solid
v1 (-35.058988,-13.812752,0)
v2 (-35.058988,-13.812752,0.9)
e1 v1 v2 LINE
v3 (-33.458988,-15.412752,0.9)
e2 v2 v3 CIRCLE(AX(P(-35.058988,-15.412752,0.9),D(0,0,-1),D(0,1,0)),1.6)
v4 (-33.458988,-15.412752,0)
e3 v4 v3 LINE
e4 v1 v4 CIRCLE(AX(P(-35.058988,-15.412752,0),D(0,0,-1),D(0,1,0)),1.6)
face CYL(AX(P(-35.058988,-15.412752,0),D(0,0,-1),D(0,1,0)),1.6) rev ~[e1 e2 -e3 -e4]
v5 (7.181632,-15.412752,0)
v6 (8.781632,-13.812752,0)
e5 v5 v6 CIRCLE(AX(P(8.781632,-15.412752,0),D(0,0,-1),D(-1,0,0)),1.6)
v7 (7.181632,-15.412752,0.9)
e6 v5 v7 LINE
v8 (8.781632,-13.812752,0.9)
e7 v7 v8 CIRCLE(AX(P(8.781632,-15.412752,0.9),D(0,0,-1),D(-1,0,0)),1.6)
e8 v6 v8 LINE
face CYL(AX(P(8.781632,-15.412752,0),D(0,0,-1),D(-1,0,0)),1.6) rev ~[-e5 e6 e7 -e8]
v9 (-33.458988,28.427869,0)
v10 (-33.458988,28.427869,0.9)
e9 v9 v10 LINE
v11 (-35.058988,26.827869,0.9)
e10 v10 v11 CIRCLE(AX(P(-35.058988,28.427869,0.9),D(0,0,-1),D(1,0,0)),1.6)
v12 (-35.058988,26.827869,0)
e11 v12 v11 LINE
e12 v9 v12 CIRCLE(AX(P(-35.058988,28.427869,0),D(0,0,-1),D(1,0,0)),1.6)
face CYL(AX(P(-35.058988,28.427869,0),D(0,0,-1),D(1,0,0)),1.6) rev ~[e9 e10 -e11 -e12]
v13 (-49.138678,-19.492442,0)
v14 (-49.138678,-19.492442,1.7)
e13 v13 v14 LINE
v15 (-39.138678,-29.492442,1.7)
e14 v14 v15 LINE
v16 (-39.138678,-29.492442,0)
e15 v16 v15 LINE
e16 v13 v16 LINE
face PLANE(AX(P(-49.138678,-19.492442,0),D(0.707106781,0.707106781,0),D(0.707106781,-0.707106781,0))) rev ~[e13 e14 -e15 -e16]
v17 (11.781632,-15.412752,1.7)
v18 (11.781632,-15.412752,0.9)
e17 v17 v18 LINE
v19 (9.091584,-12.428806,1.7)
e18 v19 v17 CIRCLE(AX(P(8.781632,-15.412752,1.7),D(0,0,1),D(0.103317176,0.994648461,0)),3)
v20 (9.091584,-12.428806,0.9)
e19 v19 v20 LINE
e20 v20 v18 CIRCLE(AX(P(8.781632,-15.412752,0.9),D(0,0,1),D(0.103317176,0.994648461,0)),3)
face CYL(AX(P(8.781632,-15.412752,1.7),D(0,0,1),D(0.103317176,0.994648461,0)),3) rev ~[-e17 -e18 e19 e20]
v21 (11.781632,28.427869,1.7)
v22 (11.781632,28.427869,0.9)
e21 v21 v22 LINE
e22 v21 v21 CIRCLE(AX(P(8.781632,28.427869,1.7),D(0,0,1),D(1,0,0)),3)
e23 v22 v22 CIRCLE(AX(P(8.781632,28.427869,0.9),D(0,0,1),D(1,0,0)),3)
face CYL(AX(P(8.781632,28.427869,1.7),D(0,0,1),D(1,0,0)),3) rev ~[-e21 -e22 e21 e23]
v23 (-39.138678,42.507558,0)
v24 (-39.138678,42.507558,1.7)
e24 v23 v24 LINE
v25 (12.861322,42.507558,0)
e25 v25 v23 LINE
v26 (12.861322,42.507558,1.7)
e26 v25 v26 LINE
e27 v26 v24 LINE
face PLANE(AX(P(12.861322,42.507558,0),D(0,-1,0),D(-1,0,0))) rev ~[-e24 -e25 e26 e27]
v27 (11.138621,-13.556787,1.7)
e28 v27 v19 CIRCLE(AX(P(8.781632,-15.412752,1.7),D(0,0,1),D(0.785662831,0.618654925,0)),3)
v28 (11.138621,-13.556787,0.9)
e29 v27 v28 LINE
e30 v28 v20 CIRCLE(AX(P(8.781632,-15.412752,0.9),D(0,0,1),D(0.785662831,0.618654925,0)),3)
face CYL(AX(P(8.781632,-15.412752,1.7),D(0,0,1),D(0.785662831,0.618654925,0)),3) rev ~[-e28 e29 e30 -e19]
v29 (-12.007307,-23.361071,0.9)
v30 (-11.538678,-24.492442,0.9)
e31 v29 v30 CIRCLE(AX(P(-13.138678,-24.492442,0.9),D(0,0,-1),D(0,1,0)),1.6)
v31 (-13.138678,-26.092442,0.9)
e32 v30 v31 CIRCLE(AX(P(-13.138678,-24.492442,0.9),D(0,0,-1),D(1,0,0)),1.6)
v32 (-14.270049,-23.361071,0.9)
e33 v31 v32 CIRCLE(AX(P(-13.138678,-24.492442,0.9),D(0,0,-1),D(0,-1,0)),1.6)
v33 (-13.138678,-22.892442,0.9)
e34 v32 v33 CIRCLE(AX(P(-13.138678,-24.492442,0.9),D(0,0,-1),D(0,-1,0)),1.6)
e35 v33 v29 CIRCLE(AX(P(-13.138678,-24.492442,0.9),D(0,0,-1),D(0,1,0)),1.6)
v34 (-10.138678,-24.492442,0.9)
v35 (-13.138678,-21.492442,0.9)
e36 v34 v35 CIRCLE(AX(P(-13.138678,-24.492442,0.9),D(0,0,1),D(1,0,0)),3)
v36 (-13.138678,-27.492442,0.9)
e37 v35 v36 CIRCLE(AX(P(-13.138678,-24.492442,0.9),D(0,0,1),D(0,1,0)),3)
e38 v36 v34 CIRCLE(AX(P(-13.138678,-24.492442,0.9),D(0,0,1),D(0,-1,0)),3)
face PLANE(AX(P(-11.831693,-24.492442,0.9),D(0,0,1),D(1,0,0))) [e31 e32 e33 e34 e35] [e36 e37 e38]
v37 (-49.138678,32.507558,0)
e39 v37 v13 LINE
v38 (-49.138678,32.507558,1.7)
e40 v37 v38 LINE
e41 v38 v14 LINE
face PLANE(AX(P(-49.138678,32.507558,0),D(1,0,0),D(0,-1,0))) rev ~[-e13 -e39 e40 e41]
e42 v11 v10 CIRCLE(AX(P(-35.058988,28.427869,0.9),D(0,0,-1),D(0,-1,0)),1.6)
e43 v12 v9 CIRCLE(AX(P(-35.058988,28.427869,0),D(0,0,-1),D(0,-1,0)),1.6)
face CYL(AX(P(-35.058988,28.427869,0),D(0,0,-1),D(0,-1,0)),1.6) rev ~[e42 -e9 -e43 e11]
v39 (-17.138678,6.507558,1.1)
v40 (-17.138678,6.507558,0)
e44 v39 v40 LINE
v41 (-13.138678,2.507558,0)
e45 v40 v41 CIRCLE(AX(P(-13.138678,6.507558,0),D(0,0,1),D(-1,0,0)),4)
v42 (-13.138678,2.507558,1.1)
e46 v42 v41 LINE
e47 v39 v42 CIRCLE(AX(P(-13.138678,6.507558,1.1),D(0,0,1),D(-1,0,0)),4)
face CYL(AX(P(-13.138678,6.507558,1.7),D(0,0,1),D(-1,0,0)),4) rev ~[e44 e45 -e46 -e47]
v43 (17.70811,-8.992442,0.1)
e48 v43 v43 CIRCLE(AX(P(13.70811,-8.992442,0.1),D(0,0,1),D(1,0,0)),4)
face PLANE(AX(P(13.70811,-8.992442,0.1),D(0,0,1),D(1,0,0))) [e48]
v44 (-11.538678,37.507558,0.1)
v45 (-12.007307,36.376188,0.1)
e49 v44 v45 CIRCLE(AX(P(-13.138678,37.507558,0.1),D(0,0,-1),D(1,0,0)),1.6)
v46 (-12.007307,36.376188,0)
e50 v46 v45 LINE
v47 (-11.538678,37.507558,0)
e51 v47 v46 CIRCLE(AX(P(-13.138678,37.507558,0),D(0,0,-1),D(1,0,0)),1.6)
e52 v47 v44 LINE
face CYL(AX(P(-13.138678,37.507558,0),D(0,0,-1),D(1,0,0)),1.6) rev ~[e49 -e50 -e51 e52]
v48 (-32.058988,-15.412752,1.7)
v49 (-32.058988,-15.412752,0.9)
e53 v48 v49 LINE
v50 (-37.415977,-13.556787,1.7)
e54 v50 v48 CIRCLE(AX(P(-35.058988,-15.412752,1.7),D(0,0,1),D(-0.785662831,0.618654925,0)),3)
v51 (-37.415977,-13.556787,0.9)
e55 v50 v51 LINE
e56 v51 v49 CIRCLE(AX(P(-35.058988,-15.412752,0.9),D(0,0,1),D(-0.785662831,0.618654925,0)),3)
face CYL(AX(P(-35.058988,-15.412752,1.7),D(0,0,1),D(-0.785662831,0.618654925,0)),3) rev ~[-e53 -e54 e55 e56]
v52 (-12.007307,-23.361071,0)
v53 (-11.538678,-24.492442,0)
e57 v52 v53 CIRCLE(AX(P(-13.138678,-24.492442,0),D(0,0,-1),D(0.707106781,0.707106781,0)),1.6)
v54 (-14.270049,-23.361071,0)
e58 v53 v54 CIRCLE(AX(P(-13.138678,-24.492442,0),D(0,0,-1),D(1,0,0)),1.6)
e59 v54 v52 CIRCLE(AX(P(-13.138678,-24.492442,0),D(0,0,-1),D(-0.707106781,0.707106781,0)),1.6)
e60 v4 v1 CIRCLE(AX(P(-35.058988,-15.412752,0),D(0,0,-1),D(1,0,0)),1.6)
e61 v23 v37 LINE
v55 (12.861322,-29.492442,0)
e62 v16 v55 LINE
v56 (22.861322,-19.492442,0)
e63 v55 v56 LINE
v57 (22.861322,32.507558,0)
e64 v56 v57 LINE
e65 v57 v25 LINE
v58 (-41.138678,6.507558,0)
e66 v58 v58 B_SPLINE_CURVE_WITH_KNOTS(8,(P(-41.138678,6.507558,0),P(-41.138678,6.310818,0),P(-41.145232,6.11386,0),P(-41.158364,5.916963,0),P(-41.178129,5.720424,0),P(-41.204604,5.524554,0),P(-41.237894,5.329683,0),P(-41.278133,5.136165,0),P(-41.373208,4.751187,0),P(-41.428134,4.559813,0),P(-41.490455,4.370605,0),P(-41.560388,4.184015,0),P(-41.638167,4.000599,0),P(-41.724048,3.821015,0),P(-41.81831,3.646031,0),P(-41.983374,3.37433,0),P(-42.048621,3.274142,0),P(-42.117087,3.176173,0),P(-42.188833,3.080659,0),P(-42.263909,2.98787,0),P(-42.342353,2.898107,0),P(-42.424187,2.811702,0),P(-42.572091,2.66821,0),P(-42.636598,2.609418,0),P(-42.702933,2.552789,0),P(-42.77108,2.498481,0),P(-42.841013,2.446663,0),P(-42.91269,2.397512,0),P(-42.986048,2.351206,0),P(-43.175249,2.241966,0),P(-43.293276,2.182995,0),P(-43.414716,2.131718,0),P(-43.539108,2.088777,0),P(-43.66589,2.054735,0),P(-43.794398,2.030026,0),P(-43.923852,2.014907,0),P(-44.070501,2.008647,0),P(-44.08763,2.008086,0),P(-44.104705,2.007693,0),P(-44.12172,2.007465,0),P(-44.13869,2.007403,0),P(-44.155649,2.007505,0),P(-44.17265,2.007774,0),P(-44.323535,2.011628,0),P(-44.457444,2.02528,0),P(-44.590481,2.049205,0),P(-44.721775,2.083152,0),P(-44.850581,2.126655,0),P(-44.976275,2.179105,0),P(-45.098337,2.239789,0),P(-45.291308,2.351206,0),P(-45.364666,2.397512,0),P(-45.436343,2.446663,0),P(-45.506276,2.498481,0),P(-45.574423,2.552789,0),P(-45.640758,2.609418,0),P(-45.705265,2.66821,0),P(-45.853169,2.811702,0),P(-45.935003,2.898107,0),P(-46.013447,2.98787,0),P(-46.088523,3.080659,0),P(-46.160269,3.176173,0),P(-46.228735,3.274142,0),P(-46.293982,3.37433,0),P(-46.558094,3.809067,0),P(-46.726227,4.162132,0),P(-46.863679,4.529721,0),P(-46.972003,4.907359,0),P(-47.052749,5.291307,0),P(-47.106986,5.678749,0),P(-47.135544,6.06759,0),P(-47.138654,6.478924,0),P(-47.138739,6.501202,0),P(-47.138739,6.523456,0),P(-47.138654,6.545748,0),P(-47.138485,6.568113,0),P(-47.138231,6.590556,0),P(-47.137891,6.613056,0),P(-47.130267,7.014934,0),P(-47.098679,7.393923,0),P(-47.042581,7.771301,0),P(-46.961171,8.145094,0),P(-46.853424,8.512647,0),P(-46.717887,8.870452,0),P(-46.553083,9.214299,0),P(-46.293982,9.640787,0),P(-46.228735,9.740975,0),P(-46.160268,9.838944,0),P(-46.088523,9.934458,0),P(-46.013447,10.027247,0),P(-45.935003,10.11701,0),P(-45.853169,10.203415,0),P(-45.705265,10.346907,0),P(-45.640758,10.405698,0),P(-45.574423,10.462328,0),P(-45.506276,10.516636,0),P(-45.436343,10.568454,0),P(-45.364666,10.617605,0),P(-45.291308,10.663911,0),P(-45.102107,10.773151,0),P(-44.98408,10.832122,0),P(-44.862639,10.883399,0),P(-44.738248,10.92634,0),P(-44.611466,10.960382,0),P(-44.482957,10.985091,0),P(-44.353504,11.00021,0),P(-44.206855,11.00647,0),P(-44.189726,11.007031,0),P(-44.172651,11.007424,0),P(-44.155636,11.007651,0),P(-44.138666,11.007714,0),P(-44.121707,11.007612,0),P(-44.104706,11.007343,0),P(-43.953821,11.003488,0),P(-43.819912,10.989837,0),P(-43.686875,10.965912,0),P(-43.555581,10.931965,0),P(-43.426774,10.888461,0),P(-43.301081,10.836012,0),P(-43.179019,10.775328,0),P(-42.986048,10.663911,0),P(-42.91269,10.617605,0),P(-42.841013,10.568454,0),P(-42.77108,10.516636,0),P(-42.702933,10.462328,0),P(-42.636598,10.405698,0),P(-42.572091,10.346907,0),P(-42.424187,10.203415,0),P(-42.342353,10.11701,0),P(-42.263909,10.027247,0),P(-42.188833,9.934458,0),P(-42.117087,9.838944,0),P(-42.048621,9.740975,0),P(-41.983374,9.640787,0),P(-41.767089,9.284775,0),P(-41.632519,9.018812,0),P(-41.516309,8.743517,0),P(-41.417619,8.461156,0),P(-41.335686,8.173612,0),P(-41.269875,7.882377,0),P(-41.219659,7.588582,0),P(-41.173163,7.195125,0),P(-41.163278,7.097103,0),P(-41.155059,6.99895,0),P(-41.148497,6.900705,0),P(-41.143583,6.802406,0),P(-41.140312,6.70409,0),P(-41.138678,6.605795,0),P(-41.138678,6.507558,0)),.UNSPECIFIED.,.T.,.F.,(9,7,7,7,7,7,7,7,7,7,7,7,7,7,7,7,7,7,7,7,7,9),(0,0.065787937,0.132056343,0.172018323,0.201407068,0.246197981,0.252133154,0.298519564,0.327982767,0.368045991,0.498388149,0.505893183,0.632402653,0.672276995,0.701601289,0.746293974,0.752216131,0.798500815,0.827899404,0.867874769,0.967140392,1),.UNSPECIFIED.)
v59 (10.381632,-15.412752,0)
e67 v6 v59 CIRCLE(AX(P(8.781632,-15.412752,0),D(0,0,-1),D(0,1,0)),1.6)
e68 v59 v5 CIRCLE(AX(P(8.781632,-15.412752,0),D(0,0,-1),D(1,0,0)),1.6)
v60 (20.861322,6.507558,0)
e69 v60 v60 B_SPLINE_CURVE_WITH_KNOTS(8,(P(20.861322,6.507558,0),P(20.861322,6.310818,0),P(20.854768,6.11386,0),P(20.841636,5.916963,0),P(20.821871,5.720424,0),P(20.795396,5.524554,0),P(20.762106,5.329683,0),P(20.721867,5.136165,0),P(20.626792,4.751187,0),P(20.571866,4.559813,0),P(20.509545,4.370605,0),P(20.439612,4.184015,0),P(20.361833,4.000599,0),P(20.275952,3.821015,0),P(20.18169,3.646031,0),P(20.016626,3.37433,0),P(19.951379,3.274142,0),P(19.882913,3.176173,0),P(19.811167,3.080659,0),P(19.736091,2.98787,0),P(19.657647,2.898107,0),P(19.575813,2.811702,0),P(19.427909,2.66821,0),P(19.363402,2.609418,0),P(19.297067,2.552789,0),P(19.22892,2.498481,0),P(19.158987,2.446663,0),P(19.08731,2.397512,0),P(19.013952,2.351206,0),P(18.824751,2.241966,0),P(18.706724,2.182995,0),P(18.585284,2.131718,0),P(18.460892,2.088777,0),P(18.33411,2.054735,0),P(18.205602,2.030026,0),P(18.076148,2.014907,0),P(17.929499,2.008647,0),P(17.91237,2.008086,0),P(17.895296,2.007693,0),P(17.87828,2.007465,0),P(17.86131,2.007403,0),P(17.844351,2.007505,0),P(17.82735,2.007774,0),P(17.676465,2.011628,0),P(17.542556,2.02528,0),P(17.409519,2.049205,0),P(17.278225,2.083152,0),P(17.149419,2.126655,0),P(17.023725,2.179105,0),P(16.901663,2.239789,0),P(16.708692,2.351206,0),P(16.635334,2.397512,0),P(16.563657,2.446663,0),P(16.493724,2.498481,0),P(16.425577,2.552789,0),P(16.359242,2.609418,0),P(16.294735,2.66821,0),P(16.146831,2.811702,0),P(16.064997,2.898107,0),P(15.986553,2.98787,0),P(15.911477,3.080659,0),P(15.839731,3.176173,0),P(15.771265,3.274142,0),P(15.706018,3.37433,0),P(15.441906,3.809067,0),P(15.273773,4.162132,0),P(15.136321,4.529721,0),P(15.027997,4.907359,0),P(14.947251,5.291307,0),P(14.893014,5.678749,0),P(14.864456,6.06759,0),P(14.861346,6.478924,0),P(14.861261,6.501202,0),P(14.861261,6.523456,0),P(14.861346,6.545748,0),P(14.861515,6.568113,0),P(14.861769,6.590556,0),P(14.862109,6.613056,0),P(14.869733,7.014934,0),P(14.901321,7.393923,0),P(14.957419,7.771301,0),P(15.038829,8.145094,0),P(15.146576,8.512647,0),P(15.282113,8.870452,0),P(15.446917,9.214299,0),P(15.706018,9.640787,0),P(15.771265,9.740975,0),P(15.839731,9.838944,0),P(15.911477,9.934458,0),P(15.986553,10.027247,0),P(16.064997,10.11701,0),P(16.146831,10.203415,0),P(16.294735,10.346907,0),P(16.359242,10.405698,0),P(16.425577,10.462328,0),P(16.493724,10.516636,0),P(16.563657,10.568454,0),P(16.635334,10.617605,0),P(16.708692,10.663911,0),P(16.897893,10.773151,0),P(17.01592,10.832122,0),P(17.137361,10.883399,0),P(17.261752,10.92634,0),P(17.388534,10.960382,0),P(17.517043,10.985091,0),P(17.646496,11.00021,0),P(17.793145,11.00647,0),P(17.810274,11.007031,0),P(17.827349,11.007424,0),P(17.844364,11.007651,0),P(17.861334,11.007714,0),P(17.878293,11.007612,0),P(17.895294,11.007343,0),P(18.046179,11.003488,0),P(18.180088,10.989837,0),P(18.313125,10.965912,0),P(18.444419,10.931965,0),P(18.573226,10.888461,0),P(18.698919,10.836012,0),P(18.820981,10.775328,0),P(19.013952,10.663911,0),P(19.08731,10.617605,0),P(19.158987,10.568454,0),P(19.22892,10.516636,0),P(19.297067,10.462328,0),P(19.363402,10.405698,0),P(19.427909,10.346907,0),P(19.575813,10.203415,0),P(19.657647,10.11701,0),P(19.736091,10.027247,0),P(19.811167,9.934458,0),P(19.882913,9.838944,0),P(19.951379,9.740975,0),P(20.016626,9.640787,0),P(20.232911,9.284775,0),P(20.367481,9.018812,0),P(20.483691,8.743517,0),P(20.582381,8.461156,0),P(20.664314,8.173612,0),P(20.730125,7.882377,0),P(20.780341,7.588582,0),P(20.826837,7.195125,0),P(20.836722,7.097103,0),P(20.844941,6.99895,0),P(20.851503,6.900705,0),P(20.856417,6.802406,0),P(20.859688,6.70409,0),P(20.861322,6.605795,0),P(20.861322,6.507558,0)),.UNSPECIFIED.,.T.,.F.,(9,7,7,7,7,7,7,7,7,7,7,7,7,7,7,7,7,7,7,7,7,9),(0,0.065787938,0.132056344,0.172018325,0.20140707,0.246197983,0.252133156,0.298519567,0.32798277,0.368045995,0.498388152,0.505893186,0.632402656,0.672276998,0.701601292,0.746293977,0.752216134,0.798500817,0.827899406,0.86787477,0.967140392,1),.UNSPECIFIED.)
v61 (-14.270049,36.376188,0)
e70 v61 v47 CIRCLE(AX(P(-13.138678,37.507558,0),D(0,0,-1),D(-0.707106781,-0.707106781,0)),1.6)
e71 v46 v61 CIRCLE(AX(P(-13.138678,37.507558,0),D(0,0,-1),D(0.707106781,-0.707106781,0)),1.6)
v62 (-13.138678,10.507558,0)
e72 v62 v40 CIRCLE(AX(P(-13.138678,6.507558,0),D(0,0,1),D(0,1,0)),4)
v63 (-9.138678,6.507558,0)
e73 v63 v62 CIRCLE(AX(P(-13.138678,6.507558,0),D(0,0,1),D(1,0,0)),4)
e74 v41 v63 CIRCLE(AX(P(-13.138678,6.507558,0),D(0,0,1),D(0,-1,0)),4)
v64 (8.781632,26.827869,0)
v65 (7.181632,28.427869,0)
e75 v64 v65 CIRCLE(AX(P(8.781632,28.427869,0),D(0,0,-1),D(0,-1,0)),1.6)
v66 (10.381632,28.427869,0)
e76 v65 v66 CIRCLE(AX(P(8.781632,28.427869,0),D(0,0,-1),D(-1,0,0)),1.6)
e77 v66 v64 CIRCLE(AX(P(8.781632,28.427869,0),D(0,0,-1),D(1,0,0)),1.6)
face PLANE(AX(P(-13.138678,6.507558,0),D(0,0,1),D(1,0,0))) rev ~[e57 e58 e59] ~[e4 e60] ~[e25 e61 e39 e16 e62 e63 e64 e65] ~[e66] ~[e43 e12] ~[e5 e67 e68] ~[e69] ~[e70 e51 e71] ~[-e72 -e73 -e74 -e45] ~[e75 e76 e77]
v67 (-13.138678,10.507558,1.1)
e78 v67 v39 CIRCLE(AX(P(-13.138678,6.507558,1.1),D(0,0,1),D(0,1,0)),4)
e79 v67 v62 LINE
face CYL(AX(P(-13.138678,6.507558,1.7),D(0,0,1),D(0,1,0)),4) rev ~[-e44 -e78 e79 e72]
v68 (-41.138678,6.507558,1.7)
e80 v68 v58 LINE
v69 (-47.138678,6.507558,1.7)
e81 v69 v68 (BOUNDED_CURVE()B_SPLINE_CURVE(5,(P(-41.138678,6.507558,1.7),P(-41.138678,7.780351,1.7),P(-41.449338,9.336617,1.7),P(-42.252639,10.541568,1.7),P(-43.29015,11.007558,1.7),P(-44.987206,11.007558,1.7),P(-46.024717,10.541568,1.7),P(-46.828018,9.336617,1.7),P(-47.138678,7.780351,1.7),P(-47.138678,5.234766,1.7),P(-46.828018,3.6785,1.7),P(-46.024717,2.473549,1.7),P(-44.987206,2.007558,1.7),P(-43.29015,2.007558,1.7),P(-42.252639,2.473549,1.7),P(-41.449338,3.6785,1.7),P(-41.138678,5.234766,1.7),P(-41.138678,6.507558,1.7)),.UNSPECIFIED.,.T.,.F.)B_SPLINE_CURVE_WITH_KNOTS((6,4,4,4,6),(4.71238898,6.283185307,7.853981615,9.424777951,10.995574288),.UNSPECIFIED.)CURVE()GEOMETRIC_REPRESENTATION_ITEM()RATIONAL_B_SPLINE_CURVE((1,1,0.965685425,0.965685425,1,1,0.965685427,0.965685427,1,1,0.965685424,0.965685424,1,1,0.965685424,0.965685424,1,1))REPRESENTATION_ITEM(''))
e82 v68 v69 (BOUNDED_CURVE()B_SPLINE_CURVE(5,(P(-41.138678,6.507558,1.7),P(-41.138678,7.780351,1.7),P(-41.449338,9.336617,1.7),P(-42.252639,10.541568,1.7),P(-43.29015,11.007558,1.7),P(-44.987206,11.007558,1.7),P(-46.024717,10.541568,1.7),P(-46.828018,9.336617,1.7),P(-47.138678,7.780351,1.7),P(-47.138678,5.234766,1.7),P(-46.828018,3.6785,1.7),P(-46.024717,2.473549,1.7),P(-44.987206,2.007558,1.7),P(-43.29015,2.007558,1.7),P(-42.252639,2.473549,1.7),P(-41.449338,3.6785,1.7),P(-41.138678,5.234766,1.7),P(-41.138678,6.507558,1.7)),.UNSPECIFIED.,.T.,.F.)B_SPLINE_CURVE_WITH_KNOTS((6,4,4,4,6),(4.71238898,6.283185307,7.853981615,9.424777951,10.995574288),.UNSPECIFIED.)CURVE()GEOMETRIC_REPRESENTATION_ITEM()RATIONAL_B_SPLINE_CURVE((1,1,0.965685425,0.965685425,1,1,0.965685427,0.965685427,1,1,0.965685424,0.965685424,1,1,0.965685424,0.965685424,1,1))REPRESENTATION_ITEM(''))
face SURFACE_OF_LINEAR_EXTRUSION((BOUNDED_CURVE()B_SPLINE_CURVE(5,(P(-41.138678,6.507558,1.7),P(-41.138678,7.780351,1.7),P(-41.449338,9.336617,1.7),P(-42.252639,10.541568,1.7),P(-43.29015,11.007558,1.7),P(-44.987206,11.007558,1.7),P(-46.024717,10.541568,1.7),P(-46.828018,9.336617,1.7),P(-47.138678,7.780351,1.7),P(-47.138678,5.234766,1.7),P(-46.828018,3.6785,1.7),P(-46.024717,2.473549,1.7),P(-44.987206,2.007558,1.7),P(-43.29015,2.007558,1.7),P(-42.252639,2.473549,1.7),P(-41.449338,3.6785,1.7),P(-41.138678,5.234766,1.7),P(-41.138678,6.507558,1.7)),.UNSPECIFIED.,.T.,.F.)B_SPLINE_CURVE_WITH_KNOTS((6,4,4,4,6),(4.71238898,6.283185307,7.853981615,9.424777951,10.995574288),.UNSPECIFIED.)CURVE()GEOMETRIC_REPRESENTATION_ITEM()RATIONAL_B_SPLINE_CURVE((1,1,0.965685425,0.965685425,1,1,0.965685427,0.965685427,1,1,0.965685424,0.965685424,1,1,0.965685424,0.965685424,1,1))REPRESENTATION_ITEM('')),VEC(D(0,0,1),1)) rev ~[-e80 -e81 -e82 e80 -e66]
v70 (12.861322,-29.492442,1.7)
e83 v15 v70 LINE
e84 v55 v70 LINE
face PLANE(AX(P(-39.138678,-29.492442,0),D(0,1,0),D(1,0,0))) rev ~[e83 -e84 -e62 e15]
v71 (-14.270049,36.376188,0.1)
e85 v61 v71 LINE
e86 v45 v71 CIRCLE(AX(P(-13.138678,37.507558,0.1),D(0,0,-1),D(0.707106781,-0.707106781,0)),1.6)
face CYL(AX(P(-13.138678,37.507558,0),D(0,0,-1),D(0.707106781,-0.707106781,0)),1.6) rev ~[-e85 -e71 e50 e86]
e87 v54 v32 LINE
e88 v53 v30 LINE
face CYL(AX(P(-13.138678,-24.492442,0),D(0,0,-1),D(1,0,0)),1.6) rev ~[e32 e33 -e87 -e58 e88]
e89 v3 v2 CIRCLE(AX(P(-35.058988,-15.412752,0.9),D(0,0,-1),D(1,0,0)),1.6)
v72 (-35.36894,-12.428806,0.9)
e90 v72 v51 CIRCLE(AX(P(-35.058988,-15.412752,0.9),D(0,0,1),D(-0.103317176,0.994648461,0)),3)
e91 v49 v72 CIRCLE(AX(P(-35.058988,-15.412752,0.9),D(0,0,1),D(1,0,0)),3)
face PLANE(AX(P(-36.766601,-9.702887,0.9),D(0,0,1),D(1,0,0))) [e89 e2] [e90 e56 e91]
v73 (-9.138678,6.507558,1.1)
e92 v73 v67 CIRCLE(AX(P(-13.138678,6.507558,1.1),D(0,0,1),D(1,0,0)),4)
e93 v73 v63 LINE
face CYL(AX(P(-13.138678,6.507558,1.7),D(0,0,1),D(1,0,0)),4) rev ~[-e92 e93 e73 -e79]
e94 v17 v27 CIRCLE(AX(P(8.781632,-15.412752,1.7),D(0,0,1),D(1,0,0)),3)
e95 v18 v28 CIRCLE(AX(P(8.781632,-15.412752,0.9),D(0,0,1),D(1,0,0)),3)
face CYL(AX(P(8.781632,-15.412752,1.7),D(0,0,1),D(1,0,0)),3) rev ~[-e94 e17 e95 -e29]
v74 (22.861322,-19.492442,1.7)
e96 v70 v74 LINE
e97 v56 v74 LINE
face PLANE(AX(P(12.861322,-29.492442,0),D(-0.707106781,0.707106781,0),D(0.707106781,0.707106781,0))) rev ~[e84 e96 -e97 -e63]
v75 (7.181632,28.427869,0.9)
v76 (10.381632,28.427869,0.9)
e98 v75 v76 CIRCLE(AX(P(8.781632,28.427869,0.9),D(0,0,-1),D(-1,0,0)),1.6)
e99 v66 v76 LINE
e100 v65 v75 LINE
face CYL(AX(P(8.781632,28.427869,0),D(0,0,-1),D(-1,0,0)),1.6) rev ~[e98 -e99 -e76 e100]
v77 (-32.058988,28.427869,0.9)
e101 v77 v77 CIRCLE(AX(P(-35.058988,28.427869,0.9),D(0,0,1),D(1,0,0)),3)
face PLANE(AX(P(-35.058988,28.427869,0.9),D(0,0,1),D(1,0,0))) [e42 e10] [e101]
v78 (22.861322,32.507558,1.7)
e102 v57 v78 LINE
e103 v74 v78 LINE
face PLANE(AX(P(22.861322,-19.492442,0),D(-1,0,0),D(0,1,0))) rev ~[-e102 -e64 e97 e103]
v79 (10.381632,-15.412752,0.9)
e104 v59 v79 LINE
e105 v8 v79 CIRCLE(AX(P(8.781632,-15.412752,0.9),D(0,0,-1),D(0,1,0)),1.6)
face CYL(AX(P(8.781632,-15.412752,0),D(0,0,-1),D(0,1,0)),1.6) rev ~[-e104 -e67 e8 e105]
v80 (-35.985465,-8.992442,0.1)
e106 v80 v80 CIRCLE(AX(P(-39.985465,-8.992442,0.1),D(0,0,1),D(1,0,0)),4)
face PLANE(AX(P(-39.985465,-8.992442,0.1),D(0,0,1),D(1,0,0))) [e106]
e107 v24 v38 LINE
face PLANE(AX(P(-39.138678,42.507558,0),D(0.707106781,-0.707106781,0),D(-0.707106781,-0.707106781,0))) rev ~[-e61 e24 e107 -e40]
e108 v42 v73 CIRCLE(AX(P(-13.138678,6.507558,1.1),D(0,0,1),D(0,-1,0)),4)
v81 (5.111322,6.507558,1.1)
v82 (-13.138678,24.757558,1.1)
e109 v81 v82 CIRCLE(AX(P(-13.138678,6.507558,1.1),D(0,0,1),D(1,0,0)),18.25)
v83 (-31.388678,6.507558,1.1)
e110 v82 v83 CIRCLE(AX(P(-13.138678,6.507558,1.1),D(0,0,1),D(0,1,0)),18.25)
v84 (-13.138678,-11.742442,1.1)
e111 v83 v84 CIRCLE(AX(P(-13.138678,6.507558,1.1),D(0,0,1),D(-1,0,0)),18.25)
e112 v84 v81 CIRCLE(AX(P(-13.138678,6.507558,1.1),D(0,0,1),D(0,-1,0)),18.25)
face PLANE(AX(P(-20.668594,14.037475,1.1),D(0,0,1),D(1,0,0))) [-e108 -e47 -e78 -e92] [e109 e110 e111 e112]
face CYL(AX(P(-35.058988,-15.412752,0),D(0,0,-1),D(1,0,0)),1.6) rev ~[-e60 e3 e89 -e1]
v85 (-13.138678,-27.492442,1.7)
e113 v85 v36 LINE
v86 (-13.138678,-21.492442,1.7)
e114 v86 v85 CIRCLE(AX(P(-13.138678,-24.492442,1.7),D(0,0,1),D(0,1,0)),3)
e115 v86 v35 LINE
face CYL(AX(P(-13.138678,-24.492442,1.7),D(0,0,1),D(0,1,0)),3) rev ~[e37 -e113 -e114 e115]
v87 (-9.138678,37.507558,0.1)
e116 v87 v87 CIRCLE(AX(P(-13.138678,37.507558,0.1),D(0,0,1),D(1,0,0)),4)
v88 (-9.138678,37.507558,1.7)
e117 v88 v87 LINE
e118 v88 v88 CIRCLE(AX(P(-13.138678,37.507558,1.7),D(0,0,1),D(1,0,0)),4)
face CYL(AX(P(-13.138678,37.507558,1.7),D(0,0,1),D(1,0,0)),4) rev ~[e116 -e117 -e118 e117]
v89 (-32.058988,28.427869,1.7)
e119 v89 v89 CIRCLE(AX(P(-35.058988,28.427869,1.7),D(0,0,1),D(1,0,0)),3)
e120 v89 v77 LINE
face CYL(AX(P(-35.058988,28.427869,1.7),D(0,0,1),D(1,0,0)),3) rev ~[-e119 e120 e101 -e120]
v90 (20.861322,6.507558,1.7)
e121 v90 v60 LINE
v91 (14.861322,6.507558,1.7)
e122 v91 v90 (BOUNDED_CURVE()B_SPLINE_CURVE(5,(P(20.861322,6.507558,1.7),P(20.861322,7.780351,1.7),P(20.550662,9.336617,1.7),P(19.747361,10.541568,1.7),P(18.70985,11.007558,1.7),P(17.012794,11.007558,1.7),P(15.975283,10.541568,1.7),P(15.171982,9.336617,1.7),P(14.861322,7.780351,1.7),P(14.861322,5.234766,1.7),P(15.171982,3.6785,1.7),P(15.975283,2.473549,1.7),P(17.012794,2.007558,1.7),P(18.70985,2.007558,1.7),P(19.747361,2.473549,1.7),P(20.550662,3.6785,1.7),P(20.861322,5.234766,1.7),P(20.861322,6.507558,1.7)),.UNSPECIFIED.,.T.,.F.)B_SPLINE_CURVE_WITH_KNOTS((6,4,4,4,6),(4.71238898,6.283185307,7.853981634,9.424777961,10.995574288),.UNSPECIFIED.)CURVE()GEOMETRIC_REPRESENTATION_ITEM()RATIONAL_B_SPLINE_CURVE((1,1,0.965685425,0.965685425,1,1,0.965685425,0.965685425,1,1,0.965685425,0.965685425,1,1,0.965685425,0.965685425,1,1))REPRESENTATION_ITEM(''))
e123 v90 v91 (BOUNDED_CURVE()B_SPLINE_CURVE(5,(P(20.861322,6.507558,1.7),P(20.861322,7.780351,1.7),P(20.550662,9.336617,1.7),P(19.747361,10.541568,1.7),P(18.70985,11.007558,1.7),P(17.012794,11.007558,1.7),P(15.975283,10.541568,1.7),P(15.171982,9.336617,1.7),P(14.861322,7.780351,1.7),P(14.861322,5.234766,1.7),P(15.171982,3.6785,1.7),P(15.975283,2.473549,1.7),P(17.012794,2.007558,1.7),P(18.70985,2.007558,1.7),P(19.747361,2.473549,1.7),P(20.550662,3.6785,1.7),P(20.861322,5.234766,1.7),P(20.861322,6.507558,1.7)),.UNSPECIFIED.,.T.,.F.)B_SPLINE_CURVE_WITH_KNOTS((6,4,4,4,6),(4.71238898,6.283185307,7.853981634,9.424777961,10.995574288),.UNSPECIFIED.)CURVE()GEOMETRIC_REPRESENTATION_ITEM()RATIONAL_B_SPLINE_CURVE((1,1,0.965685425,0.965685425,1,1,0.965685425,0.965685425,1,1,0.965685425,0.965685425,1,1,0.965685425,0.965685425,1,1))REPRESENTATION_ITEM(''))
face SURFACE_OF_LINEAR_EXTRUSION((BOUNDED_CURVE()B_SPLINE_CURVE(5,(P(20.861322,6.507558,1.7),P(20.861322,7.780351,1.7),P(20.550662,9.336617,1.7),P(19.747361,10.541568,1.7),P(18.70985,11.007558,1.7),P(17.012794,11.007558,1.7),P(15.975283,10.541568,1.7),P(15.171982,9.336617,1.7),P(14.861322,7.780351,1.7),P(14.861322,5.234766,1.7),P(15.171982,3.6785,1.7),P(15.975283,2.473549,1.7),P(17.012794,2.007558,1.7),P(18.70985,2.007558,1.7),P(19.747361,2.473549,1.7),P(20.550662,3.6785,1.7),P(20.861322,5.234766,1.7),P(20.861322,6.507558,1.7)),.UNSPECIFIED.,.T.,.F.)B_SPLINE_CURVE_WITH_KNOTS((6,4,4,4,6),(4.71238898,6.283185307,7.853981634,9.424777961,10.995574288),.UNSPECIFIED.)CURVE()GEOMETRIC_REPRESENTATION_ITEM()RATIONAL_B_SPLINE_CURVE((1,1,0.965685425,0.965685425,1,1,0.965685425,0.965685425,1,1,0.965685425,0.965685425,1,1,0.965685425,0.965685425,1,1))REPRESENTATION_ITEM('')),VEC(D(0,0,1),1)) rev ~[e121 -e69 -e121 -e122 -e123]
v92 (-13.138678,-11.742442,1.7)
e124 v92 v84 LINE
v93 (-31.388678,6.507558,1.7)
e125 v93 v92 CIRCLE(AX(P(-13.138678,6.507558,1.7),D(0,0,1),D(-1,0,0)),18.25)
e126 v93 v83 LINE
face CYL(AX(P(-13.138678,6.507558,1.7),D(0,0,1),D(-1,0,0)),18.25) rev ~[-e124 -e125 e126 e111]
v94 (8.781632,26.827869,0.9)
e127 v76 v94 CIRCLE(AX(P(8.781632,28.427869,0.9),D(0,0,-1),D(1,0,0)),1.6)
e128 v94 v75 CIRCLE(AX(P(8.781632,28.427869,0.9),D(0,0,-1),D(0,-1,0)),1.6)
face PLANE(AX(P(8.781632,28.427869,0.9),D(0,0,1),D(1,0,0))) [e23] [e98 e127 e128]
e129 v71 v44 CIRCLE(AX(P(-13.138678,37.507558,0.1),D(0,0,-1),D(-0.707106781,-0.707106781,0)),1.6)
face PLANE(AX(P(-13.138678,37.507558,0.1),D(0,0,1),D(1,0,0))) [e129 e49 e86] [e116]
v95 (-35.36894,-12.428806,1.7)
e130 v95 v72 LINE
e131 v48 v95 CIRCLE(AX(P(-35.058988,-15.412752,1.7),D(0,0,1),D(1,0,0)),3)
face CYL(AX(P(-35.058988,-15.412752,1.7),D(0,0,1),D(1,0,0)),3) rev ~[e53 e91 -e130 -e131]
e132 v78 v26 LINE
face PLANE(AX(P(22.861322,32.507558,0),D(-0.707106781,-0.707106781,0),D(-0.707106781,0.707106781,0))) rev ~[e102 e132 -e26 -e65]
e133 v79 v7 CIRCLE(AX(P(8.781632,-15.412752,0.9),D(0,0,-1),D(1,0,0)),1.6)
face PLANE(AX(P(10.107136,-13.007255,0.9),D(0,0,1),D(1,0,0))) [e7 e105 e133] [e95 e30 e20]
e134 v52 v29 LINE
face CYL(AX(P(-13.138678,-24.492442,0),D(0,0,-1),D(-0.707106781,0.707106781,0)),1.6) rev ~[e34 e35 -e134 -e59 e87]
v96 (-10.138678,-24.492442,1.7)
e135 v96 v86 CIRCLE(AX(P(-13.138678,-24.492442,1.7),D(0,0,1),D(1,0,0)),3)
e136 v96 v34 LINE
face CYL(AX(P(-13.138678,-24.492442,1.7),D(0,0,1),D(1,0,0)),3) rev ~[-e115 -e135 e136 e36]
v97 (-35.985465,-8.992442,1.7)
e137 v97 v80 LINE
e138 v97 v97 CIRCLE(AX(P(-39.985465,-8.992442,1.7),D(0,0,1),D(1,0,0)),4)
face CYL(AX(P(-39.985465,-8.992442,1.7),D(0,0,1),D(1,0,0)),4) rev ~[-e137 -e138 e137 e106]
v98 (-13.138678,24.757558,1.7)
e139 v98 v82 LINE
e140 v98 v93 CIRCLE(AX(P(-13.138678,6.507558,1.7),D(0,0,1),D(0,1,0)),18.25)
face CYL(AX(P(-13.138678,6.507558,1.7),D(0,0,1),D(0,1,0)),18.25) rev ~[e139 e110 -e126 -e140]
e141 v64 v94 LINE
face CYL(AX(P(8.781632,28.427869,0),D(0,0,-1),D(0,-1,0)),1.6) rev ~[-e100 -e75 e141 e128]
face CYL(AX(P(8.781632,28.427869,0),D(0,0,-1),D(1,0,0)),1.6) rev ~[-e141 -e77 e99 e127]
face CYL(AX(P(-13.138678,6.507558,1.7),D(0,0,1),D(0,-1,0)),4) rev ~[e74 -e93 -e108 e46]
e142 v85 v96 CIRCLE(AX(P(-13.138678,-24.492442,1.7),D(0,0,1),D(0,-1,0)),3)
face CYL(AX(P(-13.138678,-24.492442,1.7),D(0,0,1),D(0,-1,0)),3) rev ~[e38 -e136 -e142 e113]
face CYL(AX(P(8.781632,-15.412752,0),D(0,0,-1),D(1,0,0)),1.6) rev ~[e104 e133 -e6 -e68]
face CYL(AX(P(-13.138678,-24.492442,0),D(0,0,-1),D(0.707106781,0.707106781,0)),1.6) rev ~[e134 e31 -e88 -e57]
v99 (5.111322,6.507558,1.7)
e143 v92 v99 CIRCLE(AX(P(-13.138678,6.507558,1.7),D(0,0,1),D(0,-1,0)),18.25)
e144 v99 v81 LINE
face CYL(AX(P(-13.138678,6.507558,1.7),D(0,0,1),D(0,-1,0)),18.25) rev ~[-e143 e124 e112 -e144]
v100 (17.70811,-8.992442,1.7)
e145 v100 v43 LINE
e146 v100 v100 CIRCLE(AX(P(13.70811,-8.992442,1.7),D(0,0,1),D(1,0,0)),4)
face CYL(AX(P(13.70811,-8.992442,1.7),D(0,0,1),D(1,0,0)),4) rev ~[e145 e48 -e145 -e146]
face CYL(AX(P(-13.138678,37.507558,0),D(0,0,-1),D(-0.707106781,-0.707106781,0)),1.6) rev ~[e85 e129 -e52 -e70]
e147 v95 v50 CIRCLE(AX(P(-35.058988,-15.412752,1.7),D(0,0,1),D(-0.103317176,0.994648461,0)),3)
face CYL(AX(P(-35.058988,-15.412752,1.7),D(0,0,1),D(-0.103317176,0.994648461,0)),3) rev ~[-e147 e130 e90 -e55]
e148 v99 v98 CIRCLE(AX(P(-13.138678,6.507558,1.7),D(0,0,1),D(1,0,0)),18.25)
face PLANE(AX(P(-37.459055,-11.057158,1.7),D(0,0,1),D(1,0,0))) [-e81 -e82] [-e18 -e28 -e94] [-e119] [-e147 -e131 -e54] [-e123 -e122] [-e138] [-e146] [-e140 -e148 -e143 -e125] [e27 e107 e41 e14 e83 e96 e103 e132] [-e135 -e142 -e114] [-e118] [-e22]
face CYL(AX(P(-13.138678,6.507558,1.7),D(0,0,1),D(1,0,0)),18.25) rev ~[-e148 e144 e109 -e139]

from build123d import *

# Parameters (mm, degrees)
F0_R      = 18.25
F1_DEPTH  = 1.7
F3_DEPTH  = 0.6
F4_R      = 1.6
F4_R_2    = 3
F5_DEPTH  = 0.8
F7_DEPTH  = 25
F8_R      = 2.5
F9_DEPTH  = 1.6
F10_R     = 4
F10_R_2   = 3
F11_DEPTH = 1.6
F13_DEPTH = 0.8
F15_DEPTH = 25


with BuildPart() as f1:
    # F0 (on Top) → F1 (new body)
    with BuildSketch(Plane.XY):
        Polygon((12.8613220751, 42.5075584586), (-39.1386779249, 42.5075584586), (-49.1386779249, 32.5075584586), (-49.1386779249, -19.4924415414), (-39.1386779249, -29.4924415414), (12.8613220751, -29.4924415414), (22.8613220751, -19.4924415414), (22.8613220751, 32.5075584586), align=None)
        with BuildLine():
            ThreePointArc((-35.0589881417, 26.8278686754), (-36.1903589916, 29.5592395253), (-33.4589881417, 28.4278686754))
            Line((-33.4589881417, 28.4278686754), (-22.2183677081, 28.4278686754))
            Line((-22.2183677081, 28.4278686754), (-14.2700487748, 36.3761876087))
            ThreePointArc((-14.2700487748, 36.3761876087), (-13.7509714167, 38.9857657106), (-11.5386779249, 37.5075584586))
            ThreePointArc((-11.5386779249, 37.5075584586), (-11.6604706729, 36.8952649668), (-12.007307075, 36.3761876087))
            Line((-12.007307075, 36.3761876087), (-4.0589881417, 28.4278686754))
            Line((-4.0589881417, 28.4278686754), (7.1816322919, 28.4278686754))
            ThreePointArc((7.1816322919, 28.4278686754), (8.7816322919, 30.0278686754), (10.3816322919, 28.4278686754))
            ThreePointArc((10.3816322919, 28.4278686754), (9.9130031418, 27.2964978255), (8.7816322919, 26.8278686754))
            Line((8.7816322919, 26.8278686754), (8.7816322919, 15.5872482418))
            Line((8.7816322919, 15.5872482418), (16.7299512252, 7.6389293085))
            ThreePointArc((16.7299512252, 7.6389293085), (18.4736155669, 7.9857657106), (19.4613220751, 6.5075584586))
            ThreePointArc((19.4613220751, 6.5075584586), (18.4736155669, 5.0293512066), (16.7299512252, 5.3761876087))
            Line((16.7299512252, 5.3761876087), (8.7816322919, -2.5721313246))
            Line((8.7816322919, -2.5721313246), (8.7816322919, -13.8127517582))
            ThreePointArc((8.7816322919, -13.8127517582), (9.9130031418, -14.2813809083), (10.3816322919, -15.4127517582))
            ThreePointArc((10.3816322919, -15.4127517582), (8.7816322919, -17.0127517582), (7.1816322919, -15.4127517582))
            Line((7.1816322919, -15.4127517582), (-4.0589881417, -15.4127517582))
            Line((-4.0589881417, -15.4127517582), (-12.007307075, -23.3610706915))
            ThreePointArc((-12.007307075, -23.3610706915), (-11.6604706729, -23.8801480496), (-11.5386779249, -24.4924415414))
            ThreePointArc((-11.5386779249, -24.4924415414), (-13.7509714167, -25.9706487934), (-14.2700487748, -23.3610706915))
            Line((-14.2700487748, -23.3610706915), (-22.2183677081, -15.4127517582))
            Line((-22.2183677081, -15.4127517582), (-33.4589881417, -15.4127517582))
            ThreePointArc((-33.4589881417, -15.4127517582), (-36.1903589916, -16.5441226081), (-35.0589881417, -13.8127517582))
            Line((-35.0589881417, -13.8127517582), (-35.0589881417, -2.5721313246))
            Line((-35.0589881417, -2.5721313246), (-43.007307075, 5.3761876087))
            ThreePointArc((-43.007307075, 5.3761876087), (-45.7386779249, 6.5075584586), (-43.007307075, 7.6389293085))
            Line((-43.007307075, 7.6389293085), (-35.0589881417, 15.5872482418))
            Line((-35.0589881417, 15.5872482418), (-35.0589881417, 26.8278686754))
        make_face(mode=Mode.SUBTRACT)
        with BuildLine():
            Line((-22.2183677081, 28.4278686754), (-33.4589881417, 28.4278686754))
            ThreePointArc((-33.4589881417, 28.4278686754), (-33.9276172918, 27.2964978255), (-35.0589881417, 26.8278686754))
            Line((-35.0589881417, 26.8278686754), (-35.0589881417, 15.5872482418))
            Line((-35.0589881417, 15.5872482418), (-22.2183677081, 28.4278686754))
        make_face()
        with BuildLine():
            Line((-14.2700487748, 36.3761876087), (-22.2183677081, 28.4278686754))
            Line((-22.2183677081, 28.4278686754), (-4.0589881417, 28.4278686754))
            Line((-4.0589881417, 28.4278686754), (-12.007307075, 36.3761876087))
            ThreePointArc((-12.007307075, 36.3761876087), (-13.1386779249, 35.9075584586), (-14.2700487748, 36.3761876087))
        make_face()
        with BuildLine():
            Line((7.1816322919, 28.4278686754), (-4.0589881417, 28.4278686754))
            Line((-4.0589881417, 28.4278686754), (8.7816322919, 15.5872482418))
            Line((8.7816322919, 15.5872482418), (8.7816322919, 26.8278686754))
            ThreePointArc((8.7816322919, 26.8278686754), (7.650261442, 27.2964978255), (7.1816322919, 28.4278686754))
        make_face()
        with BuildLine():
            Line((16.7299512252, 7.6389293085), (8.7816322919, 15.5872482418))
            Line((8.7816322919, 15.5872482418), (8.7816322919, -2.5721313246))
            Line((8.7816322919, -2.5721313246), (16.7299512252, 5.3761876087))
            ThreePointArc((16.7299512252, 5.3761876087), (16.2613220751, 6.5075584586), (16.7299512252, 7.6389293085))
        make_face()
        with BuildLine():
            Line((8.7816322919, -13.8127517582), (8.7816322919, -2.5721313246))
            Line((8.7816322919, -2.5721313246), (-4.0589881417, -15.4127517582))
            Line((-4.0589881417, -15.4127517582), (7.1816322919, -15.4127517582))
            ThreePointArc((7.1816322919, -15.4127517582), (7.650261442, -14.2813809083), (8.7816322919, -13.8127517582))
        make_face()
        with BuildLine():
            Line((-4.0589881417, -15.4127517582), (-22.2183677081, -15.4127517582))
            Line((-22.2183677081, -15.4127517582), (-14.2700487748, -23.3610706915))
            ThreePointArc((-14.2700487748, -23.3610706915), (-13.1386779249, -22.8924415414), (-12.007307075, -23.3610706915))
            Line((-12.007307075, -23.3610706915), (-4.0589881417, -15.4127517582))
        make_face()
        with BuildLine():
            Line((-22.2183677081, -15.4127517582), (-35.0589881417, -2.5721313246))
            Line((-35.0589881417, -2.5721313246), (-35.0589881417, -13.8127517582))
            ThreePointArc((-35.0589881417, -13.8127517582), (-33.9276172918, -14.2813809083), (-33.4589881417, -15.4127517582))
            Line((-33.4589881417, -15.4127517582), (-22.2183677081, -15.4127517582))
        make_face()
        with BuildLine():
            Line((-35.0589881417, -2.5721313246), (-35.0589881417, 15.5872482418))
            Line((-35.0589881417, 15.5872482418), (-43.007307075, 7.6389293085))
            ThreePointArc((-43.007307075, 7.6389293085), (-42.6604706729, 7.1198519504), (-42.5386779249, 6.5075584586))
            ThreePointArc((-42.5386779249, 6.5075584586), (-42.6604706729, 5.8952649668), (-43.007307075, 5.3761876087))
            Line((-43.007307075, 5.3761876087), (-35.0589881417, -2.5721313246))
        make_face()
        Polygon((-4.0589881417, 28.4278686754), (-22.2183677081, 28.4278686754), (-35.0589881417, 15.5872482418), (-35.0589881417, -2.5721313246), (-22.2183677081, -15.4127517582), (-4.0589881417, -15.4127517582), (8.7816322919, -2.5721313246), (8.7816322919, 15.5872482418), align=None)
        with Locations((-13.1386779249, 6.5075584586)):
            Circle(F0_R, mode=Mode.SUBTRACT)
        with Locations((-13.1386779249, 6.5075584586)):
            Circle(F0_R)
    extrude(amount=F1_DEPTH)

    # F2 (on face) → F3 (cut)
    with BuildSketch(Plane.XY.offset(1.7)):
        with BuildLine():
            Line((-31.3886779249, 6.5075584586), (-13.1386779249, 6.5075584586))
            Line((-13.1386779249, 6.5075584586), (-13.1386779249, 24.7575584586))
            ThreePointArc((-13.1386779249, 24.7575584586), (-26.0433766815, 19.4122572153), (-31.3886779249, 6.5075584586))
        make_face()
        with BuildLine():
            ThreePointArc((-13.1386779249, -11.7424415414), (-0.2339791682, -6.397140298), (5.1113220751, 6.5075584586))
            Line((5.1113220751, 6.5075584586), (-13.1386779249, 6.5075584586))
            Line((-13.1386779249, 6.5075584586), (-13.1386779249, -11.7424415414))
        make_face()
        with BuildLine():
            Line((-13.1386779249, 6.5075584586), (5.1113220751, 6.5075584586))
            ThreePointArc((5.1113220751, 6.5075584586), (-0.2339791682, 19.4122572153), (-13.1386779249, 24.7575584586))
            Line((-13.1386779249, 24.7575584586), (-13.1386779249, 6.5075584586))
        make_face()
        with BuildLine():
            Line((-13.1386779249, -11.7424415414), (-13.1386779249, 6.5075584586))
            Line((-13.1386779249, 6.5075584586), (-31.3886779249, 6.5075584586))
            ThreePointArc((-31.3886779249, 6.5075584586), (-26.0433766815, -6.397140298), (-13.1386779249, -11.7424415414))
        make_face()
    extrude(amount=-F3_DEPTH, mode=Mode.SUBTRACT)

    # F4 (on face) → F5 (cut)
    with BuildSketch(Plane.XY.offset(1.7)):
        with BuildLine():
            ThreePointArc((-45.7386779249, 6.5075584586), (-44.1386779249, 8.1075584586), (-42.5386779249, 6.5075584586))
            Line((-42.5386779249, 6.5075584586), (-41.1386779249, 6.5075584586))
            ThreePointArc((-41.1386779249, 6.5075584586), (-44.1386779249, 9.5075584586), (-47.1386779249, 6.5075584586))
            Line((-47.1386779249, 6.5075584586), (-45.7386779249, 6.5075584586))
        make_face()
        with BuildLine():
            ThreePointArc((-45.7386779249, 6.5075584586), (-44.1386779249, 4.9075584586), (-42.5386779249, 6.5075584586))
            Line((-42.5386779249, 6.5075584586), (-45.7386779249, 6.5075584586))
        make_face()
        with BuildLine():
            Line((-45.7386779249, 6.5075584586), (-42.5386779249, 6.5075584586))
            ThreePointArc((-42.5386779249, 6.5075584586), (-44.1386779249, 8.1075584586), (-45.7386779249, 6.5075584586))
        make_face()
        with BuildLine():
            Line((-41.1386779249, 6.5075584586), (-42.5386779249, 6.5075584586))
            ThreePointArc((-42.5386779249, 6.5075584586), (-44.1386779249, 4.9075584586), (-45.7386779249, 6.5075584586))
            Line((-45.7386779249, 6.5075584586), (-47.1386779249, 6.5075584586))
            ThreePointArc((-47.1386779249, 6.5075584586), (-44.1386779249, 3.5075584586), (-41.1386779249, 6.5075584586))
        make_face()
        with BuildLine():
            ThreePointArc((-35.4323567059, -9.5934317721), (-36.3209238445, -8.8312520534), (-37.4590547769, -8.5571581567))
            Line((-37.4590547769, -8.5571581567), (-37.4590547769, -11.0571581567))
            Line((-37.4590547769, -11.0571581567), (-35.4323567059, -9.5934317721))
        make_face()
        with BuildLine():
            Line((-37.4590547769, -11.0571581567), (-37.4590547769, -8.5571581567))
            ThreePointArc((-37.4590547769, -8.5571581567), (-39.6849608802, -9.9190272243), (-39.4857528479, -12.5208845413))
            Line((-39.4857528479, -12.5208845413), (-37.4590547769, -11.0571581567))
        make_face()
        with BuildLine():
            Line((-34.9590547769, -11.0571581567), (-37.4590547769, -11.0571581567))
            Line((-37.4590547769, -11.0571581567), (-39.4857528479, -12.5208845413))
            ThreePointArc((-39.4857528479, -12.5208845413), (-38.5779651724, -13.2927877161), (-37.4159766348, -13.5567869839))
            ThreePointArc((-37.4159766348, -13.5567869839), (-36.5068235367, -12.7852486338), (-35.3689396686, -12.4288063748))
            ThreePointArc((-35.3689396686, -12.4288063748), (-35.0637168288, -11.7729487089), (-34.9590547769, -11.0571581567))
        make_face()
        with BuildLine():
            Line((-35.4323567059, -9.5934317721), (-37.4590547769, -11.0571581567))
            Line((-37.4590547769, -11.0571581567), (-34.9590547769, -11.0571581567))
            ThreePointArc((-34.9590547769, -11.0571581567), (-35.0803213768, -10.2879849569), (-35.4323567059, -9.5934317721))
        make_face()
        with BuildLine():
            ThreePointArc((-35.3689396686, -12.4288063748), (-36.5068235367, -12.7852486338), (-37.4159766348, -13.5567869839))
            ThreePointArc((-37.4159766348, -13.5567869839), (-36.252525281, -13.2467440937), (-35.3689396686, -12.4288063748))
        make_face()
        with BuildLine():
            ThreePointArc((-35.3689396686, -12.4288063748), (-36.252525281, -13.2467440937), (-37.4159766348, -13.5567869839))
            ThreePointArc((-37.4159766348, -13.5567869839), (-36.0410865381, -18.2474444646), (-32.0589881417, -15.4127517582))
            ThreePointArc((-32.0589881417, -15.4127517582), (-33.0502391007, -13.1845400783), (-35.3689396686, -12.4288063748))
        make_face()
        with Locations((-35.0589881417, -15.4127517582)):
            Circle(F4_R, mode=Mode.SUBTRACT)
        with BuildLine():
            ThreePointArc((-13.1386779249, 40.5075584586), (-16.1386779249, 37.5075584586), (-13.1386779249, 34.5075584586))
            Line((-13.1386779249, 34.5075584586), (-13.1386779249, 35.9075584586))
            ThreePointArc((-13.1386779249, 35.9075584586), (-14.7386779249, 37.5075584586), (-13.1386779249, 39.1075584586))
            Line((-13.1386779249, 39.1075584586), (-13.1386779249, 40.5075584586))
        make_face()
        with BuildLine():
            Line((-13.1386779249, 35.9075584586), (-13.1386779249, 34.5075584586))
            ThreePointArc((-13.1386779249, 34.5075584586), (-11.0173575813, 35.3862381151), (-10.1386779249, 37.5075584586))
            ThreePointArc((-10.1386779249, 37.5075584586), (-11.0173575813, 39.6288788022), (-13.1386779249, 40.5075584586))
            Line((-13.1386779249, 40.5075584586), (-13.1386779249, 39.1075584586))
            ThreePointArc((-13.1386779249, 39.1075584586), (-12.007307075, 38.6389293085), (-11.5386779249, 37.5075584586))
            ThreePointArc((-11.5386779249, 37.5075584586), (-12.007307075, 36.3761876087), (-13.1386779249, 35.9075584586))
        make_face()
        with BuildLine():
            ThreePointArc((-10.1386779249, -24.4924415414), (-11.0173575813, -22.3711211978), (-13.1386779249, -21.4924415414))
            Line((-13.1386779249, -21.4924415414), (-13.1386779249, -22.8924415414))
            ThreePointArc((-13.1386779249, -22.8924415414), (-12.007307075, -23.3610706915), (-11.5386779249, -24.4924415414))
            ThreePointArc((-11.5386779249, -24.4924415414), (-12.007307075, -25.6238123913), (-13.1386779249, -26.0924415414))
            Line((-13.1386779249, -26.0924415414), (-13.1386779249, -27.4924415414))
            ThreePointArc((-13.1386779249, -27.4924415414), (-11.0173575813, -26.6137618849), (-10.1386779249, -24.4924415414))
        make_face()
        with BuildLine():
            Line((-13.1386779249, -22.8924415414), (-13.1386779249, -21.4924415414))
            ThreePointArc((-13.1386779249, -21.4924415414), (-16.1386779249, -24.4924415414), (-13.1386779249, -27.4924415414))
            Line((-13.1386779249, -27.4924415414), (-13.1386779249, -26.0924415414))
            ThreePointArc((-13.1386779249, -26.0924415414), (-14.7386779249, -24.4924415414), (-13.1386779249, -22.8924415414))
        make_face()
        with BuildLine():
            ThreePointArc((11.1816989271, -8.5571581567), (10.0435679947, -8.8312520534), (9.1550008561, -9.5934317721))
            Line((9.1550008561, -9.5934317721), (11.1816989271, -11.0571581567))
            Line((11.1816989271, -11.0571581567), (11.1816989271, -8.5571581567))
        make_face()
        with BuildLine():
            Line((11.1816989271, -11.0571581567), (9.1550008561, -9.5934317721))
            ThreePointArc((9.1550008561, -9.5934317721), (8.802965527, -10.2879849569), (8.6816989271, -11.0571581567))
            Line((8.6816989271, -11.0571581567), (11.1816989271, -11.0571581567))
        make_face()
        with BuildLine():
            ThreePointArc((20.8613220751, 6.5075584586), (17.8613220751, 9.5075584586), (14.8613220751, 6.5075584586))
            Line((14.8613220751, 6.5075584586), (16.2613220751, 6.5075584586))
            ThreePointArc((16.2613220751, 6.5075584586), (17.8613220751, 8.1075584586), (19.4613220751, 6.5075584586))
            Line((19.4613220751, 6.5075584586), (20.8613220751, 6.5075584586))
        make_face()
        with BuildLine():
            Line((16.2613220751, 6.5075584586), (14.8613220751, 6.5075584586))
            ThreePointArc((14.8613220751, 6.5075584586), (17.8613220751, 3.5075584586), (20.8613220751, 6.5075584586))
            Line((20.8613220751, 6.5075584586), (19.4613220751, 6.5075584586))
            ThreePointArc((19.4613220751, 6.5075584586), (17.8613220751, 4.9075584586), (16.2613220751, 6.5075584586))
        make_face()
        with BuildLine():
            ThreePointArc((13.6816989271, -11.0571581567), (12.9494658801, -9.2893912037), (11.1816989271, -8.5571581567))
            Line((11.1816989271, -8.5571581567), (11.1816989271, -11.0571581567))
            Line((11.1816989271, -11.0571581567), (13.2083969981, -12.5208845413))
            ThreePointArc((13.2083969981, -12.5208845413), (13.5604323272, -11.8263313565), (13.6816989271, -11.0571581567))
        make_face()
        with BuildLine():
            ThreePointArc((11.138620785, -13.5567869839), (10.229467687, -12.7852486338), (9.0915838189, -12.4288063748))
            ThreePointArc((9.0915838189, -12.4288063748), (9.9751694312, -13.2467440937), (11.138620785, -13.5567869839))
        make_face()
        with BuildLine():
            ThreePointArc((11.138620785, -13.5567869839), (9.9751694312, -13.2467440937), (9.0915838189, -12.4288063748))
            ThreePointArc((9.0915838189, -12.4288063748), (6.553420612, -17.4215007991), (11.7816322919, -15.4127517582))
            ThreePointArc((11.7816322919, -15.4127517582), (11.6163249983, -14.4306533617), (11.138620785, -13.5567869839))
        make_face()
        with Locations((8.7816322919, -15.4127517582)):
            Circle(F4_R, mode=Mode.SUBTRACT)
        with BuildLine():
            ThreePointArc((19.4613220751, 6.5075584586), (17.8613220751, 8.1075584586), (16.2613220751, 6.5075584586))
            Line((16.2613220751, 6.5075584586), (19.4613220751, 6.5075584586))
        make_face()
        with BuildLine():
            Line((19.4613220751, 6.5075584586), (16.2613220751, 6.5075584586))
            ThreePointArc((16.2613220751, 6.5075584586), (17.8613220751, 4.9075584586), (19.4613220751, 6.5075584586))
        make_face()
        with Locations((-35.0589881417, 28.4278686754)):
            Circle(F4_R_2)
        with Locations((-35.0589881417, 28.4278686754)):
            Circle(F4_R, mode=Mode.SUBTRACT)
        with Locations((8.7816322919, 28.4278686754)):
            Circle(F4_R_2)
        with Locations((8.7816322919, 28.4278686754)):
            Circle(F4_R, mode=Mode.SUBTRACT)
        with Locations((-35.0589881417, -15.4127517582)):
            Circle(F4_R)
        with Locations((8.7816322919, -15.4127517582)):
            Circle(F4_R)
        with Locations((-35.0589881417, 28.4278686754)):
            Circle(F4_R)
        with Locations((8.7816322919, 28.4278686754)):
            Circle(F4_R)
    extrude(amount=-F5_DEPTH, mode=Mode.SUBTRACT)

    # F6 (on face) → F7 (cut)
    with BuildSketch(Plane.XY.offset(1.7)):
        with BuildLine():
            ThreePointArc((-9.1386779249, 6.5075584586), (-10.3102508001, 9.3359855834), (-13.1386779249, 10.5075584586))
            Line((-13.1386779249, 10.5075584586), (-13.1386779249, 6.5075584586))
            Line((-13.1386779249, 6.5075584586), (-9.1386779249, 6.5075584586))
        make_face()
        with BuildLine():
            Line((-13.1386779249, 6.5075584586), (-13.1386779249, 10.5075584586))
            ThreePointArc((-13.1386779249, 10.5075584586), (-15.9671050496, 9.3359855834), (-17.1386779249, 6.5075584586))
            Line((-17.1386779249, 6.5075584586), (-13.1386779249, 6.5075584586))
        make_face()
        with BuildLine():
            Line((-9.1386779249, 6.5075584586), (-13.1386779249, 6.5075584586))
            Line((-13.1386779249, 6.5075584586), (-13.1386779249, 2.5075584586))
            ThreePointArc((-13.1386779249, 2.5075584586), (-10.3102508001, 3.6791313339), (-9.1386779249, 6.5075584586))
        make_face()
        with BuildLine():
            Line((-13.1386779249, 2.5075584586), (-13.1386779249, 6.5075584586))
            Line((-13.1386779249, 6.5075584586), (-17.1386779249, 6.5075584586))
            ThreePointArc((-17.1386779249, 6.5075584586), (-15.9671050496, 3.6791313339), (-13.1386779249, 2.5075584586))
        make_face()
    extrude(amount=-F7_DEPTH, mode=Mode.SUBTRACT)

    # F8 (on face) → F9 (join)
    with BuildSketch(Plane.XY.offset(1.7)):
        with Locations((-37.4590547769, -11.0571581567)):
            Circle(F8_R)
        with Locations((11.1816989271, -11.0571581567)):
            Circle(F8_R)
    extrude(amount=-F9_DEPTH)

    # F10 (on face) → F11 (cut)
    with BuildSketch(Plane.XY.offset(1.7)):
        with Locations((-13.1386779249, 37.5075584586)):
            Circle(F10_R)
        with Locations((-13.1386779249, 37.5075584586)):
            Circle(F10_R_2, mode=Mode.SUBTRACT)
        with Locations((13.7081095924, -8.9924415414)):
            Circle(F10_R)
        with Locations((-39.9854654422, -8.9924415414)):
            Circle(F10_R)
        with Locations((-44.1386779249, 6.5075584586)):
            Circle(F10_R_2)
        with Locations((-13.1386779249, 37.5075584586)):
            Circle(F10_R_2)
    extrude(amount=-F11_DEPTH, mode=Mode.SUBTRACT)

    # F12 (on face) → F13 (cut)
    with BuildSketch(Plane.XY.offset(1.7)):
        with BuildLine():
            ThreePointArc((9.0915838189, -12.4288063748), (9.9751694312, -13.2467440937), (11.138620785, -13.5567869839))
            ThreePointArc((11.138620785, -13.5567869839), (10.229467687, -12.7852486338), (9.0915838189, -12.4288063748))
        make_face()
        with BuildLine():
            ThreePointArc((9.0915838189, -12.4288063748), (6.553420612, -17.4215007991), (11.7816322919, -15.4127517582))
            ThreePointArc((11.7816322919, -15.4127517582), (11.6163249983, -14.4306533617), (11.138620785, -13.5567869839))
            ThreePointArc((11.138620785, -13.5567869839), (9.9751694312, -13.2467440937), (9.0915838189, -12.4288063748))
        make_face()
        with BuildLine():
            ThreePointArc((-37.4159766348, -13.5567869839), (-36.0410865381, -18.2474444646), (-32.0589881417, -15.4127517582))
            ThreePointArc((-32.0589881417, -15.4127517582), (-33.0502391007, -13.1845400783), (-35.3689396686, -12.4288063748))
            ThreePointArc((-35.3689396686, -12.4288063748), (-36.252525281, -13.2467440937), (-37.4159766348, -13.5567869839))
        make_face()
        with BuildLine():
            ThreePointArc((-37.4159766348, -13.5567869839), (-36.252525281, -13.2467440937), (-35.3689396686, -12.4288063748))
            ThreePointArc((-35.3689396686, -12.4288063748), (-36.5068235367, -12.7852486338), (-37.4159766348, -13.5567869839))
        make_face()
    extrude(amount=-F13_DEPTH, mode=Mode.SUBTRACT)

    # F14 (on face) → F15 (cut)
    with BuildSketch(Plane.XY.offset(1.7)):
        with BuildLine():
            add(Edge.make_bspline(
                [(-47.1386779249, 6.5075585663), (-47.1386779967, 2.0075585125), (-44.1386779608, 2.0075584586), (-41.1386779249, 2.0075584048), (-41.1386779249, 6.5075584586)],
                knots=[1.5707963029, 1.5707963029, 1.5707963029, 3.1415926416, 3.1415926416, 4.7123889804, 4.7123889804, 4.7123889804], degree=2, weights=[1, 0.707106777, 1, 0.707106777, 1]))
            ThreePointArc((-41.1386779249, 6.5075584586), (-44.1386779787, 3.5075584586), (-47.1386779249, 6.5075585663))
        make_face()
        with BuildLine():
            add(Edge.make_bspline(
                [(14.8613220751, 6.5075584586), (14.8613220751, 2.0075584586), (17.8613220751, 2.0075584586), (20.8613220751, 2.0075584586), (20.8613220751, 6.5075584586)],
                knots=[1.5707963268, 1.5707963268, 1.5707963268, 3.1415926536, 3.1415926536, 4.7123889804, 4.7123889804, 4.7123889804], degree=2, weights=[1, 0.7071067812, 1, 0.7071067812, 1]))
            ThreePointArc((20.8613220751, 6.5075584586), (17.8613220751, 3.5075584586), (14.8613220751, 6.5075584586))
        make_face()
        with BuildLine():
            ThreePointArc((14.8613220751, 6.5075584586), (17.8613220751, 9.5075584586), (20.8613220751, 6.5075584586))
            add(Edge.make_bspline(
                [(20.8613220751, 6.5075584586), (20.8613220751, 11.0075584586), (17.8613220751, 11.0075584586)],
                knots=[4.7123889804, 4.7123889804, 4.7123889804, 6.2831853072, 6.2831853072, 6.2831853072], degree=2, weights=[1, 0.7071067812, 1]))
            add(Edge.make_bspline(
                [(17.8613220751, 11.0075584586), (14.8613220751, 11.0075584586), (14.8613220751, 6.5075584586)],
                knots=[0, 0, 0, 1.5707963268, 1.5707963268, 1.5707963268], degree=2, weights=[1, 0.7071067812, 1]))
        make_face()
        with BuildLine():
            ThreePointArc((-47.1386779249, 6.5075585663), (-44.1386779787, 3.5075584586), (-41.1386779249, 6.5075584586))
            ThreePointArc((-41.1386779249, 6.5075584586), (-44.138677871, 9.5075584586), (-47.1386779249, 6.5075585663))
        make_face()
        with BuildLine():
            ThreePointArc((14.8613220751, 6.5075584586), (17.8613220751, 3.5075584586), (20.8613220751, 6.5075584586))
            ThreePointArc((20.8613220751, 6.5075584586), (17.8613220751, 9.5075584586), (14.8613220751, 6.5075584586))
        make_face()
        with BuildLine():
            ThreePointArc((-47.1386779249, 6.5075585663), (-44.138677871, 9.5075584586), (-41.1386779249, 6.5075584586))
            add(Edge.make_bspline(
                [(-41.1386779249, 6.5075584586), (-41.1386779249, 11.0075584586), (-44.1386779249, 11.0075584586)],
                knots=[4.7123889804, 4.7123889804, 4.7123889804, 6.2831853072, 6.2831853072, 6.2831853072], degree=2, weights=[1, 0.7071067812, 1]))
            add(Edge.make_bspline(
                [(-44.1386779249, 11.0075584586), (-47.1386778531, 11.0075584586), (-47.1386779249, 6.5075585663)],
                knots=[0, 0, 0, 1.5707963029, 1.5707963029, 1.5707963029], degree=2, weights=[1, 0.7071067896, 1]))
        make_face()
    extrude(amount=-F15_DEPTH, mode=Mode.SUBTRACT)


solid = f1.part
